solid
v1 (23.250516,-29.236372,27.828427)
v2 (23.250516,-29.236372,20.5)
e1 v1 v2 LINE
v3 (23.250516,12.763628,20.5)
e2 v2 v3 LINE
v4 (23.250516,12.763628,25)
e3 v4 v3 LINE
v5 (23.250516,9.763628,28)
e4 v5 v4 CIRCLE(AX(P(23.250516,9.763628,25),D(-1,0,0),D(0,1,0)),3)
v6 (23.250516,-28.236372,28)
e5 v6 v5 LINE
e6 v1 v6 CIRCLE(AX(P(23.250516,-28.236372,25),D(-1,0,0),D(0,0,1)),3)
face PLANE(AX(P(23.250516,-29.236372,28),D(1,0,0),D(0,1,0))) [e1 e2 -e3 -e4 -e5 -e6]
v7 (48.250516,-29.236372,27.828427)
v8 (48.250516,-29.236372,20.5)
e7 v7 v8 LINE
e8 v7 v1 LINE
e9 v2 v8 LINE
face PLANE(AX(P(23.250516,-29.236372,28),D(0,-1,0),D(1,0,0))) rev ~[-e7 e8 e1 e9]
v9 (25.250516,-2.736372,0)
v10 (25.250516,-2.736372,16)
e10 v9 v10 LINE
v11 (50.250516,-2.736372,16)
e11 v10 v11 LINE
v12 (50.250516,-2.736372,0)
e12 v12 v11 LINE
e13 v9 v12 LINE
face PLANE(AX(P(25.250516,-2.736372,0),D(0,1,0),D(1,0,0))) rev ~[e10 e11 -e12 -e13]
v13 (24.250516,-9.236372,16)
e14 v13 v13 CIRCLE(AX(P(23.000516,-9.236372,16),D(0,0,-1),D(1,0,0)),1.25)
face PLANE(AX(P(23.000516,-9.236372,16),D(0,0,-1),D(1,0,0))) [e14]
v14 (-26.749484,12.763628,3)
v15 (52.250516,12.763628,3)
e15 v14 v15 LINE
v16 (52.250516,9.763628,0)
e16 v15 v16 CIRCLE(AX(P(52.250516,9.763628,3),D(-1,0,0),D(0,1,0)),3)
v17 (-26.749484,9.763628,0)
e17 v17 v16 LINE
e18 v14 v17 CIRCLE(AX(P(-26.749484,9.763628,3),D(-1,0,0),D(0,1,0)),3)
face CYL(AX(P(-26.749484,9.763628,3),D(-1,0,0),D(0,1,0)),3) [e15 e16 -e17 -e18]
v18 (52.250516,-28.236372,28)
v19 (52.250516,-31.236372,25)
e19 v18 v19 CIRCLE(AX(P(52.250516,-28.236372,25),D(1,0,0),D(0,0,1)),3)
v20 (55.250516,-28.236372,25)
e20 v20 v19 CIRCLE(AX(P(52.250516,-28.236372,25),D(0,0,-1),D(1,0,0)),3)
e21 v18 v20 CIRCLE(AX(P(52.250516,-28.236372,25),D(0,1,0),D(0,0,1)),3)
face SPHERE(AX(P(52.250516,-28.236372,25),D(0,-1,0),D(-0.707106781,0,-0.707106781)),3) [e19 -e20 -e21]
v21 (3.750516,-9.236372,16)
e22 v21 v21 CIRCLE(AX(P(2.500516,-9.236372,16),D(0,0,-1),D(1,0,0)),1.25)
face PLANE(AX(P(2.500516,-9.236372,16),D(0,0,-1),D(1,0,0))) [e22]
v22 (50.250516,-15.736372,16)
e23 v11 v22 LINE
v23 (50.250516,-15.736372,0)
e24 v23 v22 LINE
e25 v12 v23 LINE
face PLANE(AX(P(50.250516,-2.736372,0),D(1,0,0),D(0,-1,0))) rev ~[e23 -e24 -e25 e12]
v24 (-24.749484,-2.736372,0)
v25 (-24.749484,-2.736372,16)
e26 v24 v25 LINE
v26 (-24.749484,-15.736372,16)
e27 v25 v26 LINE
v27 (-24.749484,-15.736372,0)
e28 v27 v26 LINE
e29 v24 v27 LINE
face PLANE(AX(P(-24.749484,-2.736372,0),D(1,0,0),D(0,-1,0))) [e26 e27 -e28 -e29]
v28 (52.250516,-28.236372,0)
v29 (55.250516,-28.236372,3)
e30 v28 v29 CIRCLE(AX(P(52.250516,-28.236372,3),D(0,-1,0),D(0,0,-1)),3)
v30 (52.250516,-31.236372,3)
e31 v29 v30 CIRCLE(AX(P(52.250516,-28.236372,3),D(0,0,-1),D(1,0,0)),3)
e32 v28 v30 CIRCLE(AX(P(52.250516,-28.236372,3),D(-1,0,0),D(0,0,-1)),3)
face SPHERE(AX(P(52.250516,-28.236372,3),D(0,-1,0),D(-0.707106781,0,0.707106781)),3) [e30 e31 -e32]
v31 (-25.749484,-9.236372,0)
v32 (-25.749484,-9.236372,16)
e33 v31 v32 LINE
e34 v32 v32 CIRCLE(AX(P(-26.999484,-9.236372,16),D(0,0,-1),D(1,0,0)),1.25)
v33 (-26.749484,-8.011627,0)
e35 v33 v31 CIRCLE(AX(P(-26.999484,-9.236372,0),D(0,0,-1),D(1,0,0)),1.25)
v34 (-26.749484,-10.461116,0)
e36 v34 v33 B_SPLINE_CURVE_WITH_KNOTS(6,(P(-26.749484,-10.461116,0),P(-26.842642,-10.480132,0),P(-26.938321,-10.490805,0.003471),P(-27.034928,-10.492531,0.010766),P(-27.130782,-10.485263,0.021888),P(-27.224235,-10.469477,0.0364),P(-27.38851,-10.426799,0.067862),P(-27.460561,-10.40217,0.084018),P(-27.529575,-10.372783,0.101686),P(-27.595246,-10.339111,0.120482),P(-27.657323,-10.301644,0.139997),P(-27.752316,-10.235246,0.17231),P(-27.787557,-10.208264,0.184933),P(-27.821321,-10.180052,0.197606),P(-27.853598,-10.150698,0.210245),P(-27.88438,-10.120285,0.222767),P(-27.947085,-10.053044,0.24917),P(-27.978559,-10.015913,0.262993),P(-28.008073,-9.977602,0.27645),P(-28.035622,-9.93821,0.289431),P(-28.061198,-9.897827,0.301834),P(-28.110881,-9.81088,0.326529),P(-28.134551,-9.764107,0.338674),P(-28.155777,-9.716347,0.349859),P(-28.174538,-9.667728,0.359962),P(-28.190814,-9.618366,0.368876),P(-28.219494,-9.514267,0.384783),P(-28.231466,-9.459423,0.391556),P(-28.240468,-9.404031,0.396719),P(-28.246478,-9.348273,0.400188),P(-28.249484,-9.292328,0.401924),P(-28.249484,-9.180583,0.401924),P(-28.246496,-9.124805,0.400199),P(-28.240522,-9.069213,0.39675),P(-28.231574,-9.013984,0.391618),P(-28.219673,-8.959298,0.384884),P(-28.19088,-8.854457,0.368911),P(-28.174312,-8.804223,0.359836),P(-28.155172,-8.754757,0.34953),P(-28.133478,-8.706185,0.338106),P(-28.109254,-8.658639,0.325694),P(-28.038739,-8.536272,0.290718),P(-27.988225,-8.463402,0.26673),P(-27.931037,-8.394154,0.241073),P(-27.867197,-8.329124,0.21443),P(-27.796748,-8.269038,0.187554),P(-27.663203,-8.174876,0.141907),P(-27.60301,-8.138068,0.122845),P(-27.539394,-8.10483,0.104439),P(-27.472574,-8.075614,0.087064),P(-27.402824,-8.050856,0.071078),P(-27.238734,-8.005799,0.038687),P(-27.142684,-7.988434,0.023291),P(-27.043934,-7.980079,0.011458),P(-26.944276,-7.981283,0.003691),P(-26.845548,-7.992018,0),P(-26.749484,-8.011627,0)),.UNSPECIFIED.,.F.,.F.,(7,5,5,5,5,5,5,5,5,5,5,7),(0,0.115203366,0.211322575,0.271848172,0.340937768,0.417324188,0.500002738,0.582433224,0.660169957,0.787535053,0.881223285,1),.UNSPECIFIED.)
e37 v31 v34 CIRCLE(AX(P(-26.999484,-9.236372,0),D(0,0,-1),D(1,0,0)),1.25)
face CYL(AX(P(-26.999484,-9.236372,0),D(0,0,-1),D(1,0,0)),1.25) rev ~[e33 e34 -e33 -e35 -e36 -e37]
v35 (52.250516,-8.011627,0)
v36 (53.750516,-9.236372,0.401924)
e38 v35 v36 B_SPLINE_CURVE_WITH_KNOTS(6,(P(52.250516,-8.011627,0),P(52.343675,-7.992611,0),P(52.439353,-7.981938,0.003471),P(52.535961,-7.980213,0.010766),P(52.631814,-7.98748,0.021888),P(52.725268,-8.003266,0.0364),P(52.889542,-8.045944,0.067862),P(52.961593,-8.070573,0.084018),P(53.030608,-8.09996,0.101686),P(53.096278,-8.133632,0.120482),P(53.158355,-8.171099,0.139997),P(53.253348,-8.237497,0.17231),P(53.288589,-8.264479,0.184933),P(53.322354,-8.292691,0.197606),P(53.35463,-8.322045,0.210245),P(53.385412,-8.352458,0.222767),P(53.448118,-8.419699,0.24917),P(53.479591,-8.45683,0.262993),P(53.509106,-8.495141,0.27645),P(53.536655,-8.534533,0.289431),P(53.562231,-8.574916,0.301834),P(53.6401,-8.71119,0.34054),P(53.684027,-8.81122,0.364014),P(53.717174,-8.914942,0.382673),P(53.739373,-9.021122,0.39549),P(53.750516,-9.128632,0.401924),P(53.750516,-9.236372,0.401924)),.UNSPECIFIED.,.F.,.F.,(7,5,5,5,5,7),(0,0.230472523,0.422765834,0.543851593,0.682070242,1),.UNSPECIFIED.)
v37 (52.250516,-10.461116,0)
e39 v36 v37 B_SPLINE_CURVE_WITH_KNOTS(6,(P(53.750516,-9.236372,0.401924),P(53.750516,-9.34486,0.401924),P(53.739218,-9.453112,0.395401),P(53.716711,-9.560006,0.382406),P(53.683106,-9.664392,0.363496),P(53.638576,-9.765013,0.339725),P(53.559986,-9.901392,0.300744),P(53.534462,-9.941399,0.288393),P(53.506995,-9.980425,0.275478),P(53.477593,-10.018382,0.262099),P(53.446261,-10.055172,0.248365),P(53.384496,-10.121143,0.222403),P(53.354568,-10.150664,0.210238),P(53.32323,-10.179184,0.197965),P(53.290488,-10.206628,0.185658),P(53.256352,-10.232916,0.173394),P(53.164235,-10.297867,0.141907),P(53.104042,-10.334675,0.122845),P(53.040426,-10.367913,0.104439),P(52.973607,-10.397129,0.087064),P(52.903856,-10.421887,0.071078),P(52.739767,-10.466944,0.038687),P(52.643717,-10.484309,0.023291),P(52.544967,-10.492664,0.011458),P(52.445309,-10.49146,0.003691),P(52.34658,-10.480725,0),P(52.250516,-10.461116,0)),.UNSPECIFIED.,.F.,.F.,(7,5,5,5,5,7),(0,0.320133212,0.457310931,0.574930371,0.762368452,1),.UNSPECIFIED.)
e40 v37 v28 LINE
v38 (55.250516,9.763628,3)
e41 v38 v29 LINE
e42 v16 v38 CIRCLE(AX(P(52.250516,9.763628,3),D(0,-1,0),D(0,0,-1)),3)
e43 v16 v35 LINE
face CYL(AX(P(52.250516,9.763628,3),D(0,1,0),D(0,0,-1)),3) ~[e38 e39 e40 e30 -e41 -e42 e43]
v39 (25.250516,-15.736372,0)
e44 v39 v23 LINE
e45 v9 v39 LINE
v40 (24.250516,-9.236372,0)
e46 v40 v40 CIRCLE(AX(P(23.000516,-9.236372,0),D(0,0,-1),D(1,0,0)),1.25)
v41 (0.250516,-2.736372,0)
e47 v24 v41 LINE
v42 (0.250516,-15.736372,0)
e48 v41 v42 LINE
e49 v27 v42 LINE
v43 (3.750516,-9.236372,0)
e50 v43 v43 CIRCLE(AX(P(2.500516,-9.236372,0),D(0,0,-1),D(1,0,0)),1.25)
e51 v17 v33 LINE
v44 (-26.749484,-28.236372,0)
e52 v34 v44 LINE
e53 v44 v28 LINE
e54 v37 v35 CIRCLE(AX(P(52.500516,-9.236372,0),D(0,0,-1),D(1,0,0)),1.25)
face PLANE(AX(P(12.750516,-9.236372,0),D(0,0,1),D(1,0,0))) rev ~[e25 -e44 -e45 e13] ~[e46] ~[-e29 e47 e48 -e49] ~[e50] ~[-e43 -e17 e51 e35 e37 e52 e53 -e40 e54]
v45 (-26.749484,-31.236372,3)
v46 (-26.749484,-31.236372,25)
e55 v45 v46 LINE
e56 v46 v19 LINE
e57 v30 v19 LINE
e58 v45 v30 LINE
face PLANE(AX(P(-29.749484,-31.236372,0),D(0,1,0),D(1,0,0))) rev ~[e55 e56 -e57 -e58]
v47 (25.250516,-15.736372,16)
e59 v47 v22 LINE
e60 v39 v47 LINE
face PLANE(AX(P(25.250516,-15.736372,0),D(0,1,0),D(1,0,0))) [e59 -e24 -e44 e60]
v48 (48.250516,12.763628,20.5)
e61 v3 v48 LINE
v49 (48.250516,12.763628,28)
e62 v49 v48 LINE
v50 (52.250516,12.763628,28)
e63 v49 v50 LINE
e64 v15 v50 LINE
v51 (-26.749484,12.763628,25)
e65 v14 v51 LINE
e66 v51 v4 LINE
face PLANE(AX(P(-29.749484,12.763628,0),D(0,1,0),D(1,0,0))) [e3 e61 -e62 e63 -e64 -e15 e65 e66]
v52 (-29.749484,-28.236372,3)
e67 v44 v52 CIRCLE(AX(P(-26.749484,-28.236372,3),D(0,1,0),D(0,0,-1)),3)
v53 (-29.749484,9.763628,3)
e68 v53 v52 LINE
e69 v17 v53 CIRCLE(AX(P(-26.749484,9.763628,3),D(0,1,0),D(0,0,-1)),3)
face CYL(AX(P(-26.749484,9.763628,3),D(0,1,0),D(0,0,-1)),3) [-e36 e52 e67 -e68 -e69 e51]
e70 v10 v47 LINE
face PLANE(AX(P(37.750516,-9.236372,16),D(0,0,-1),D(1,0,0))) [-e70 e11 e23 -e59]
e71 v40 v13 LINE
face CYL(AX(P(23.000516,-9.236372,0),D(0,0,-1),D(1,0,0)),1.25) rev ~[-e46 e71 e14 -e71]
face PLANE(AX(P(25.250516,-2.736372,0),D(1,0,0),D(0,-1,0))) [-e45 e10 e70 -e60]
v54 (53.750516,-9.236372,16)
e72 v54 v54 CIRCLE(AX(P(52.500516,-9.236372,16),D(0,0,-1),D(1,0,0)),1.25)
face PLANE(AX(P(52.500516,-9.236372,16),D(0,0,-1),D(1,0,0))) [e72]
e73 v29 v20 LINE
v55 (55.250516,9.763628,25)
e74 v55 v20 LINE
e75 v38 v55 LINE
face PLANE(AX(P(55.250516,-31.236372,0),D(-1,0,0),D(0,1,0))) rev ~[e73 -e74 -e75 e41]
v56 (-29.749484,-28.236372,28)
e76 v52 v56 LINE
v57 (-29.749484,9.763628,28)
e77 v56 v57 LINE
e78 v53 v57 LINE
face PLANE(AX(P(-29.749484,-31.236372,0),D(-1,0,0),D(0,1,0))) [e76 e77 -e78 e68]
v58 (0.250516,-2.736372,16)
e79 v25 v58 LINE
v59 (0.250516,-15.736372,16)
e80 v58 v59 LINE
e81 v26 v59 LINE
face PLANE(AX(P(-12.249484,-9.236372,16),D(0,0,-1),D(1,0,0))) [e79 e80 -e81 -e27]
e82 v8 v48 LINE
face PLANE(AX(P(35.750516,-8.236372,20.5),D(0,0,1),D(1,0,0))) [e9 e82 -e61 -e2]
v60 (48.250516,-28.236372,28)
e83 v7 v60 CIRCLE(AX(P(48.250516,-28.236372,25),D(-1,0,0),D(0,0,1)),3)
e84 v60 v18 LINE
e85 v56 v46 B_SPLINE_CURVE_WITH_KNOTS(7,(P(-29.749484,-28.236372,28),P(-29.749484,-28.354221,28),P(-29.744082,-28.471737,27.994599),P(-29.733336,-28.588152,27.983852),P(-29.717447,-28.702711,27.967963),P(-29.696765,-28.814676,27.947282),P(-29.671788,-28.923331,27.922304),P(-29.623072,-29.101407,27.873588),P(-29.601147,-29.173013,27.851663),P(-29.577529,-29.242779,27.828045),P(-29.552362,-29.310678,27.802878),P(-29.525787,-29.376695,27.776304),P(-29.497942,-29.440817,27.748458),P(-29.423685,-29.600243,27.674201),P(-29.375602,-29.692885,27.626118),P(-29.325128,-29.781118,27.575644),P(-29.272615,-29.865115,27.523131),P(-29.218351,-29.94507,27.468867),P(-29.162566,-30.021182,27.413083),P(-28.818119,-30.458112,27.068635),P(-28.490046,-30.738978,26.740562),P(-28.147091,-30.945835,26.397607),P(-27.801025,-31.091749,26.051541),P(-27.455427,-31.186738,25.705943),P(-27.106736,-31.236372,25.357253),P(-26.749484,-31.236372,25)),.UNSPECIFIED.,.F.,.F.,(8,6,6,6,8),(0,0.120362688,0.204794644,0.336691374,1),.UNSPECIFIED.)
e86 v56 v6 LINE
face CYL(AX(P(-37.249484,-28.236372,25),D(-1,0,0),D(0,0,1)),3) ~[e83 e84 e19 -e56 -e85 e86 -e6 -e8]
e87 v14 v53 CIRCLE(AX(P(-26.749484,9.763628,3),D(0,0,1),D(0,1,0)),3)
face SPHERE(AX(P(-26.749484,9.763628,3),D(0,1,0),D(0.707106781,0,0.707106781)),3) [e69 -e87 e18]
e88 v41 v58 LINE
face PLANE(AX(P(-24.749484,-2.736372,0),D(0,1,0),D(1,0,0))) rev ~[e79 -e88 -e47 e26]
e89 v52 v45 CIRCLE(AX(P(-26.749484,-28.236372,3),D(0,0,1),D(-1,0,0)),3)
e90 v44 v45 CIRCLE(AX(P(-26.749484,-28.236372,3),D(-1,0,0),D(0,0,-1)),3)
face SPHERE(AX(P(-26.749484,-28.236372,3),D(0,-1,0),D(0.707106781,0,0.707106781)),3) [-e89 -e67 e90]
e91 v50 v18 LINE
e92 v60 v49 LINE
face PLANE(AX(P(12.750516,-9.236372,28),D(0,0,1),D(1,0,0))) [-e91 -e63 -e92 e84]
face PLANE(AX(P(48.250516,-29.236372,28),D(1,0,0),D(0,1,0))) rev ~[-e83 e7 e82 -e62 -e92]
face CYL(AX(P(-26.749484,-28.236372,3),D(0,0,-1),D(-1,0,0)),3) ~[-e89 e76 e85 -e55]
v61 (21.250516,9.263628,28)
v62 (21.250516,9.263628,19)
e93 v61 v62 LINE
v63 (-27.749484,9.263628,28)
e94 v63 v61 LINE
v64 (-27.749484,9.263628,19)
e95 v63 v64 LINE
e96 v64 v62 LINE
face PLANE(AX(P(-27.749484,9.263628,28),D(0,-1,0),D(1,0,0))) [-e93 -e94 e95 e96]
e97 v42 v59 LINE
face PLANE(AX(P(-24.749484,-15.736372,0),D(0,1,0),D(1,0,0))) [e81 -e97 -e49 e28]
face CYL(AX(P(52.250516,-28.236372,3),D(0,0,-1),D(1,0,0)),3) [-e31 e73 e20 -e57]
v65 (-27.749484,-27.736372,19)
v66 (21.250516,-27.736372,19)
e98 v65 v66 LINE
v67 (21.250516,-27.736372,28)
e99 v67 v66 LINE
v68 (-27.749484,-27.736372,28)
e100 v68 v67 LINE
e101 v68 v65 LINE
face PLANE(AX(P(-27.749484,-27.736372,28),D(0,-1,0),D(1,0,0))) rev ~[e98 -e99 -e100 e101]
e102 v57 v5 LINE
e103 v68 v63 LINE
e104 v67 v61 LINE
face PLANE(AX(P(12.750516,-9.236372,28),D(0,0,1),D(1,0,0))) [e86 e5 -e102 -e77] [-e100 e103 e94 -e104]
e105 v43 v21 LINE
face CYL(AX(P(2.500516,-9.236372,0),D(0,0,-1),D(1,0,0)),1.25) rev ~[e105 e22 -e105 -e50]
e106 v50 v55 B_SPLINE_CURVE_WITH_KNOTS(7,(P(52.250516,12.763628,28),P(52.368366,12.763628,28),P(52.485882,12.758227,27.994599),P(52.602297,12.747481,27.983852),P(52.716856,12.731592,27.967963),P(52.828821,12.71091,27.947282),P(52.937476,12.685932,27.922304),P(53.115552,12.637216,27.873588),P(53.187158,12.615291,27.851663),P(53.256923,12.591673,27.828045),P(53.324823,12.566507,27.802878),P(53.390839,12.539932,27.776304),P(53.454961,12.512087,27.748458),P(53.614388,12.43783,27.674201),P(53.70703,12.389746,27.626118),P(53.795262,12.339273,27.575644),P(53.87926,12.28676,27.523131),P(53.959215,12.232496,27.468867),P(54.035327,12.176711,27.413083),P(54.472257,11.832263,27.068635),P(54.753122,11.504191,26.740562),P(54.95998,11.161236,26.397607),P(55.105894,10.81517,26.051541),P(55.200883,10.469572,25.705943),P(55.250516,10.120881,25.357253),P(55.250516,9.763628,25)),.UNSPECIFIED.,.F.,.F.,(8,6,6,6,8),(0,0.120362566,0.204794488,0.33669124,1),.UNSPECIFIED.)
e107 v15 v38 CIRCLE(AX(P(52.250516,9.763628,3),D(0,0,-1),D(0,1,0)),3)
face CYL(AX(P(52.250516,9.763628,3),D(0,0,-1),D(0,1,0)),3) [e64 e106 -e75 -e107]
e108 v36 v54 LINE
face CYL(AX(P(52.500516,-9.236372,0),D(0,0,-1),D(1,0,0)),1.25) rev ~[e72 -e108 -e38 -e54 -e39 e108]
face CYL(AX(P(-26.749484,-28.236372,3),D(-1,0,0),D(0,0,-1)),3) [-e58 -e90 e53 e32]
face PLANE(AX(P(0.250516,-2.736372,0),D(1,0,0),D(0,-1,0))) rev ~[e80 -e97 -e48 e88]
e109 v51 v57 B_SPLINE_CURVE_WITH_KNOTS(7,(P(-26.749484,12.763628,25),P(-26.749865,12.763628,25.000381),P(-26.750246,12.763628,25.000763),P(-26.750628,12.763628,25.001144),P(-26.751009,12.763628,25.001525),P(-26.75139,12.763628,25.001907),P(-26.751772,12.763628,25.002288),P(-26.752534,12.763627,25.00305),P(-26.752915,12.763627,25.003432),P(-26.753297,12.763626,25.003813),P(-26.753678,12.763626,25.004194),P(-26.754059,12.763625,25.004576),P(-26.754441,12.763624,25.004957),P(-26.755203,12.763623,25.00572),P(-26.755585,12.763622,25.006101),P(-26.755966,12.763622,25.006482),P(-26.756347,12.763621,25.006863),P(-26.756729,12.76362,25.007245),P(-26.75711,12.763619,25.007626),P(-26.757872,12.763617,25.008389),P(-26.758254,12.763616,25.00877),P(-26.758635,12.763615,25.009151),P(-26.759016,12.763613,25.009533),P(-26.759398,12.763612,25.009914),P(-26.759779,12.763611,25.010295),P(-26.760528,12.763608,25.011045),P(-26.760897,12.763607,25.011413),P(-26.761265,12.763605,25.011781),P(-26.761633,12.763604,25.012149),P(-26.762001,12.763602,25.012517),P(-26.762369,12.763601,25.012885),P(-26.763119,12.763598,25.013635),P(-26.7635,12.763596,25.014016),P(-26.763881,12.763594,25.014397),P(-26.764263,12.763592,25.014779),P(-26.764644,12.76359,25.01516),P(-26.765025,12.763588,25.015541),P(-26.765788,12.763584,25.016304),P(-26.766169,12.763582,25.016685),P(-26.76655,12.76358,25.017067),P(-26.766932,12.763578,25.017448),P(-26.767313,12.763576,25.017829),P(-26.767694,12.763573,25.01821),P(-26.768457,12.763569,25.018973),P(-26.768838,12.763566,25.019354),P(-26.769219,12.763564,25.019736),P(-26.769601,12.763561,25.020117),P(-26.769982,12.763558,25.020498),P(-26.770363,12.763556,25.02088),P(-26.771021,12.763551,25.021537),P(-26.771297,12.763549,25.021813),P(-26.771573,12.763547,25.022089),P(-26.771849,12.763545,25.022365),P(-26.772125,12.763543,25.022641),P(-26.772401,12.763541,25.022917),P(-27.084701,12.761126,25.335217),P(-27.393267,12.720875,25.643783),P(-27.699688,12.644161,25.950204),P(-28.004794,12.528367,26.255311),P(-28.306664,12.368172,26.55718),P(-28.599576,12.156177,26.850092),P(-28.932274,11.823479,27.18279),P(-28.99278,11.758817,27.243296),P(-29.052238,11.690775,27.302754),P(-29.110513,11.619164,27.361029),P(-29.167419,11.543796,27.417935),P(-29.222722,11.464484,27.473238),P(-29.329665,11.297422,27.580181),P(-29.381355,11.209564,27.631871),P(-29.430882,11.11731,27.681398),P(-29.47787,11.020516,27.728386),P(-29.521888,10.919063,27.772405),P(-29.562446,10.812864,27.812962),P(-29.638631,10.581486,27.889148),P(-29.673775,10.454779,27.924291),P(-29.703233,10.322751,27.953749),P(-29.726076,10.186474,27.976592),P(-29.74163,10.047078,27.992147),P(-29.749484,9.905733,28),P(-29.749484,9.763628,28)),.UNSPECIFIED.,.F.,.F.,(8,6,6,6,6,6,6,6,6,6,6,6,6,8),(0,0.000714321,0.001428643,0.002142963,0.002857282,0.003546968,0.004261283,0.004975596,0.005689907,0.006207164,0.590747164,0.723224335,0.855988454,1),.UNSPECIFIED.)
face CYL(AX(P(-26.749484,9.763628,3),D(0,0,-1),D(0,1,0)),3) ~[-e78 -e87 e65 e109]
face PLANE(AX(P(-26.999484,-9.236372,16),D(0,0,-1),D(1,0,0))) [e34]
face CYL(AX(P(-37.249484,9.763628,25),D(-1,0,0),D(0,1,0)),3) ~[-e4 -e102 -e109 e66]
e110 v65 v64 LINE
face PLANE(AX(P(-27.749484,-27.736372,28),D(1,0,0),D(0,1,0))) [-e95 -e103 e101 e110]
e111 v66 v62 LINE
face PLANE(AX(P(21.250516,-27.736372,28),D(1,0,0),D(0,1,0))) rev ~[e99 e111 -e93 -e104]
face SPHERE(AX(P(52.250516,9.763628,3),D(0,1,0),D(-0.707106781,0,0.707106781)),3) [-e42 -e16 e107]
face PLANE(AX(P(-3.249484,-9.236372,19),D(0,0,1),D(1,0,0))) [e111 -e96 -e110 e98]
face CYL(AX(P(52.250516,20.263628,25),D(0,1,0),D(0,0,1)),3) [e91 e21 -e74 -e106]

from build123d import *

# Parameters (mm, degrees)
F0_W         = 85
F0_H         = 44
F1_DEPTH     = 28
F2_W         = 49
F2_H         = 37
F3_DEPTH     = 9
F2_W_2       = 25
F2_H_2       = 42
F4_DEPTH     = 7.5
F5_W         = 25
F5_H         = 13
F5_R         = 1.25
F6_DEPTH     = 16
F7_T1_DEPTH  = 22
F7_T3_DEPTH  = 32.5
F7_T5_DEPTH  = 79
F7_T7_DEPTH  = 38
F7_T9_DEPTH  = 68
F7_T11_DEPTH = 89.5
F7_T13_DEPTH = 48.5
F7_S17_W     = 3
F7_S17_H     = 3
F7_T18_DEPTH = 3
F7_S23_W     = 3
F7_S23_H     = 3
F7_T24_DEPTH = 3
F7_S29_W     = 3
F7_S29_H     = 3
F7_T30_DEPTH = 3
F7_S35_W     = 3
F7_S35_H     = 3
F7_T36_DEPTH = 3
F7_S41_W     = 3
F7_S41_H     = 3
F7_T42_DEPTH = 3


# Not quite as in the source:
# - a fillet or chamfer that OpenCascade refuses, or shapes differently, is made with other operations: its cross-section is extruded or revolved along the edge and cut away or added


with BuildPart() as f1:
    # F0 (on Top) → F1 (new body)
    with BuildSketch(Plane.XY):
        with Locations((12.7505162358, -9.2363715138)):
            Rectangle(F0_W, F0_H)
    extrude(amount=F1_DEPTH)

    # F2 (on face) → F3 (cut)
    with BuildSketch(Plane.XY.offset(28)):
        with Locations((-3.2494837642, -9.2363715138)):
            Rectangle(F2_W, F2_H)
    extrude(amount=-F3_DEPTH, mode=Mode.SUBTRACT)

    # F2 (on face) → F4 (cut)
    with BuildSketch(Plane.XY.offset(28)):
        with Locations((35.7505162358, -8.2363715138)):
            Rectangle(F2_W_2, F2_H_2)
    extrude(amount=-F4_DEPTH, mode=Mode.SUBTRACT)

    # F5 (on face) → F6 (cut)
    with BuildSketch(Plane(origin=(0, 0, 0), x_dir=(1, 0, 0), z_dir=(0, 0, -1))):
        with Locations((-12.2494837642, 9.2363715138)):
            Rectangle(F5_W, F5_H)
        with Locations((37.7505162358, 9.2363715138)):
            Rectangle(F5_W, F5_H)
        with Locations((-26.9994837642, 9.2363715138)):
            Circle(F5_R)
        with Locations((2.5005162358, 9.2363715138)):
            Circle(F5_R)
        with Locations((23.0005162358, 9.2363715138)):
            Circle(F5_R)
        with Locations((52.5005162358, 9.2363715138)):
            Circle(F5_R)
    extrude(amount=-F6_DEPTH, mode=Mode.SUBTRACT)

    # F7: fillet of radius 3 on 11 edges, made by hand

    # F7_s2 → F7_t1 (cut)
    with BuildSketch(Plane.XY.offset(3)):
        with BuildLine():
            ThreePointArc((55.2505162358, -28.2363715138), (54.3718365794, -30.3576918574), (52.2505162358, -31.2363715138))
            Line((52.2505162358, -31.2363715138), (55.2505162358, -31.2363715138))
            Line((55.2505162358, -31.2363715138), (55.2505162358, -28.2363715138))
        make_face()
    extrude(amount=F7_T1_DEPTH, mode=Mode.SUBTRACT)

    # F7_s4 → F7_t3 (cut)
    with BuildSketch(Plane.XY.offset(3)):
        with BuildLine():
            ThreePointArc((52.2505162358, 12.7636284862), (54.3718365794, 11.8849488297), (55.2505162358, 9.7636284862))
            Line((55.2505162358, 9.7636284862), (55.2505162358, 12.7636284862))
            Line((55.2505162358, 12.7636284862), (52.2505162358, 12.7636284862))
        make_face()
        with BuildLine():
            ThreePointArc((-29.7494837642, -28.2363715138), (-28.8708041077, -30.3576918574), (-26.7494837642, -31.2363715138))
            Line((-26.7494837642, -31.2363715138), (-29.7494837642, -31.2363715138))
            Line((-29.7494837642, -31.2363715138), (-29.7494837642, -28.2363715138))
        make_face()
        with BuildLine():
            ThreePointArc((-26.7494837642, 12.7636284862), (-28.8708041077, 11.8849488297), (-29.7494837642, 9.7636284862))
            Line((-29.7494837642, 9.7636284862), (-29.7494837642, 12.7636284862))
            Line((-29.7494837642, 12.7636284862), (-26.7494837642, 12.7636284862))
        make_face()
    extrude(amount=F7_T3_DEPTH, mode=Mode.SUBTRACT)

    # F7_s6 → F7_t5 (cut)
    with BuildSketch(Plane.YZ.offset(-26.7494837642)):
        with BuildLine():
            ThreePointArc((12.7636284862, 3), (11.8849488297, 0.8786796564), (9.7636284862, 0))
            Line((9.7636284862, 0), (12.7636284862, 0))
            Line((12.7636284862, 0), (12.7636284862, 3))
        make_face()
        with BuildLine():
            ThreePointArc((-28.2363715138, 0), (-30.3576918574, 0.8786796564), (-31.2363715138, 3))
            Line((-31.2363715138, 3), (-31.2363715138, 0))
            Line((-31.2363715138, 0), (-28.2363715138, 0))
        make_face()
    extrude(amount=F7_T5_DEPTH, mode=Mode.SUBTRACT)

    # F7_s8 → F7_t7 (cut)
    with BuildSketch(Plane.XZ.offset(-9.7636284862)):
        with BuildLine():
            ThreePointArc((-26.7494837642, 0), (-28.8708041077, 0.8786796564), (-29.7494837642, 3))
            Line((-29.7494837642, 3), (-29.7494837642, 0))
            Line((-29.7494837642, 0), (-26.7494837642, 0))
        make_face()
        with BuildLine():
            ThreePointArc((52.2505162358, 0), (54.3718365794, 0.8786796564), (55.2505162358, 3))
            Line((55.2505162358, 3), (55.2505162358, 0))
            Line((55.2505162358, 0), (52.2505162358, 0))
        make_face()
    extrude(amount=F7_T7_DEPTH, mode=Mode.SUBTRACT)

    # F7_s10 → F7_t9 (cut)
    with BuildSketch(Plane.YZ.offset(-37.2494837642)):
        with BuildLine():
            ThreePointArc((12.7636284862, 25), (11.8849488297, 27.1213203436), (9.7636284862, 28))
            Line((9.7636284862, 28), (12.7636284862, 28))
            Line((12.7636284862, 28), (12.7636284862, 25))
        make_face()
    extrude(amount=F7_T9_DEPTH, mode=Mode.SUBTRACT)

    # F7_s12 → F7_t11 (cut)
    with BuildSketch(Plane.YZ.offset(-37.2494837642)):
        with BuildLine():
            ThreePointArc((-28.2363715138, 28), (-30.3576918574, 27.1213203436), (-31.2363715138, 25))
            Line((-31.2363715138, 25), (-31.2363715138, 28))
            Line((-31.2363715138, 28), (-28.2363715138, 28))
        make_face()
    extrude(amount=F7_T11_DEPTH, mode=Mode.SUBTRACT)

    # F7_s14 → F7_t13 (cut)
    with BuildSketch(Plane.XZ.offset(-20.2636284862)):
        with BuildLine():
            ThreePointArc((52.2505162358, 28), (54.3718365794, 27.1213203436), (55.2505162358, 25))
            Line((55.2505162358, 25), (55.2505162358, 28))
            Line((55.2505162358, 28), (52.2505162358, 28))
        make_face()
    extrude(amount=F7_T13_DEPTH, mode=Mode.SUBTRACT)


with BuildPart() as f7_tool16:
    # F7_s17 → F7_t18 (new body)
    with BuildSketch(Plane.XZ.offset(28.2363715138)):
        with Locations((53.7505162358, 1.5)):
            Rectangle(F7_S17_W, F7_S17_H)
    extrude(amount=F7_T18_DEPTH)

    # F7_s19 → F7_t20 (revolve, cut)
    with BuildSketch(Plane(origin=(52.2505162358, -28.2363715138, 3), x_dir=(-0.7071067812, 0, 0.7071067812), z_dir=(0.7071067812, 0, 0.7071067812))):
        with BuildLine():
            ThreePointArc((0, -3), (3, 0), (0, 3))
            Line((0, 3), (0, -3))
        make_face()
    revolve(axis=Axis((52.2505162358, -28.2363715138, 3), (0, -1, 0)), mode=Mode.SUBTRACT)


with BuildPart() as f1_1:
    add(f1.part)

    # F7_t15: cut F7_tool16
    add(f7_tool16.part, mode=Mode.SUBTRACT)


with BuildPart() as f7_tool22:
    # F7_s23 → F7_t24 (new body)
    with BuildSketch(Plane.XZ.offset(28.2363715138)):
        with Locations((53.7505162358, 26.5)):
            Rectangle(F7_S23_W, F7_S23_H)
    extrude(amount=F7_T24_DEPTH)

    # F7_s25 → F7_t26 (revolve, cut)
    with BuildSketch(Plane(origin=(52.2505162358, -28.2363715138, 25), x_dir=(-0.7071067812, 0, -0.7071067812), z_dir=(-0.7071067812, 0, 0.7071067812))):
        with BuildLine():
            ThreePointArc((0, -3), (3, 0), (0, 3))
            Line((0, 3), (0, -3))
        make_face()
    revolve(axis=Axis((52.2505162358, -28.2363715138, 25), (0, -1, 0)), mode=Mode.SUBTRACT)


with BuildPart() as f1_2:
    add(f1_1.part)

    # F7_t21: cut F7_tool22
    add(f7_tool22.part, mode=Mode.SUBTRACT)


with BuildPart() as f7_tool28:
    # F7_s29 → F7_t30 (new body)
    with BuildSketch(Plane.XZ.offset(-9.7636284862)):
        with Locations((53.7505162358, 1.5)):
            Rectangle(F7_S29_W, F7_S29_H)
    extrude(amount=-F7_T30_DEPTH)

    # F7_s31 → F7_t32 (revolve, cut)
    with BuildSketch(Plane(origin=(52.2505162358, 9.7636284862, 3), x_dir=(-0.7071067812, 0, 0.7071067812), z_dir=(-0.7071067812, 0, -0.7071067812))):
        with BuildLine():
            ThreePointArc((0, -3), (3, 0), (0, 3))
            Line((0, 3), (0, -3))
        make_face()
    revolve(axis=Axis((52.2505162358, 9.7636284862, 3), (0, 1, 0)), mode=Mode.SUBTRACT)


with BuildPart() as f1_3:
    add(f1_2.part)

    # F7_t27: cut F7_tool28
    add(f7_tool28.part, mode=Mode.SUBTRACT)


with BuildPart() as f7_tool34:
    # F7_s35 → F7_t36 (new body)
    with BuildSketch(Plane.XZ.offset(28.2363715138)):
        with Locations((-28.2494837642, 1.5)):
            Rectangle(F7_S35_W, F7_S35_H)
    extrude(amount=F7_T36_DEPTH)

    # F7_s37 → F7_t38 (revolve, cut)
    with BuildSketch(Plane(origin=(-26.7494837642, -28.2363715138, 3), x_dir=(0.7071067812, 0, 0.7071067812), z_dir=(0.7071067812, 0, -0.7071067812))):
        with BuildLine():
            ThreePointArc((0, -3), (3, 0), (0, 3))
            Line((0, 3), (0, -3))
        make_face()
    revolve(axis=Axis((-26.7494837642, -28.2363715138, 3), (0, -1, 0)), mode=Mode.SUBTRACT)


with BuildPart() as f1_4:
    add(f1_3.part)

    # F7_t33: cut F7_tool34
    add(f7_tool34.part, mode=Mode.SUBTRACT)


with BuildPart() as f7_tool40:
    # F7_s41 → F7_t42 (new body)
    with BuildSketch(Plane.XZ.offset(-9.7636284862)):
        with Locations((-28.2494837642, 1.5)):
            Rectangle(F7_S41_W, F7_S41_H)
    extrude(amount=-F7_T42_DEPTH)

    # F7_s43 → F7_t44 (revolve, cut)
    with BuildSketch(Plane(origin=(-26.7494837642, 9.7636284862, 3), x_dir=(0.7071067812, 0, 0.7071067812), z_dir=(-0.7071067812, 0, 0.7071067812))):
        with BuildLine():
            ThreePointArc((0, -3), (3, 0), (0, 3))
            Line((0, 3), (0, -3))
        make_face()
    revolve(axis=Axis((-26.7494837642, 9.7636284862, 3), (0, 1, 0)), mode=Mode.SUBTRACT)


with BuildPart() as f1_5:
    add(f1_4.part)

    # F7_t39: cut F7_tool40
    add(f7_tool40.part, mode=Mode.SUBTRACT)


solid = f1_5.part
